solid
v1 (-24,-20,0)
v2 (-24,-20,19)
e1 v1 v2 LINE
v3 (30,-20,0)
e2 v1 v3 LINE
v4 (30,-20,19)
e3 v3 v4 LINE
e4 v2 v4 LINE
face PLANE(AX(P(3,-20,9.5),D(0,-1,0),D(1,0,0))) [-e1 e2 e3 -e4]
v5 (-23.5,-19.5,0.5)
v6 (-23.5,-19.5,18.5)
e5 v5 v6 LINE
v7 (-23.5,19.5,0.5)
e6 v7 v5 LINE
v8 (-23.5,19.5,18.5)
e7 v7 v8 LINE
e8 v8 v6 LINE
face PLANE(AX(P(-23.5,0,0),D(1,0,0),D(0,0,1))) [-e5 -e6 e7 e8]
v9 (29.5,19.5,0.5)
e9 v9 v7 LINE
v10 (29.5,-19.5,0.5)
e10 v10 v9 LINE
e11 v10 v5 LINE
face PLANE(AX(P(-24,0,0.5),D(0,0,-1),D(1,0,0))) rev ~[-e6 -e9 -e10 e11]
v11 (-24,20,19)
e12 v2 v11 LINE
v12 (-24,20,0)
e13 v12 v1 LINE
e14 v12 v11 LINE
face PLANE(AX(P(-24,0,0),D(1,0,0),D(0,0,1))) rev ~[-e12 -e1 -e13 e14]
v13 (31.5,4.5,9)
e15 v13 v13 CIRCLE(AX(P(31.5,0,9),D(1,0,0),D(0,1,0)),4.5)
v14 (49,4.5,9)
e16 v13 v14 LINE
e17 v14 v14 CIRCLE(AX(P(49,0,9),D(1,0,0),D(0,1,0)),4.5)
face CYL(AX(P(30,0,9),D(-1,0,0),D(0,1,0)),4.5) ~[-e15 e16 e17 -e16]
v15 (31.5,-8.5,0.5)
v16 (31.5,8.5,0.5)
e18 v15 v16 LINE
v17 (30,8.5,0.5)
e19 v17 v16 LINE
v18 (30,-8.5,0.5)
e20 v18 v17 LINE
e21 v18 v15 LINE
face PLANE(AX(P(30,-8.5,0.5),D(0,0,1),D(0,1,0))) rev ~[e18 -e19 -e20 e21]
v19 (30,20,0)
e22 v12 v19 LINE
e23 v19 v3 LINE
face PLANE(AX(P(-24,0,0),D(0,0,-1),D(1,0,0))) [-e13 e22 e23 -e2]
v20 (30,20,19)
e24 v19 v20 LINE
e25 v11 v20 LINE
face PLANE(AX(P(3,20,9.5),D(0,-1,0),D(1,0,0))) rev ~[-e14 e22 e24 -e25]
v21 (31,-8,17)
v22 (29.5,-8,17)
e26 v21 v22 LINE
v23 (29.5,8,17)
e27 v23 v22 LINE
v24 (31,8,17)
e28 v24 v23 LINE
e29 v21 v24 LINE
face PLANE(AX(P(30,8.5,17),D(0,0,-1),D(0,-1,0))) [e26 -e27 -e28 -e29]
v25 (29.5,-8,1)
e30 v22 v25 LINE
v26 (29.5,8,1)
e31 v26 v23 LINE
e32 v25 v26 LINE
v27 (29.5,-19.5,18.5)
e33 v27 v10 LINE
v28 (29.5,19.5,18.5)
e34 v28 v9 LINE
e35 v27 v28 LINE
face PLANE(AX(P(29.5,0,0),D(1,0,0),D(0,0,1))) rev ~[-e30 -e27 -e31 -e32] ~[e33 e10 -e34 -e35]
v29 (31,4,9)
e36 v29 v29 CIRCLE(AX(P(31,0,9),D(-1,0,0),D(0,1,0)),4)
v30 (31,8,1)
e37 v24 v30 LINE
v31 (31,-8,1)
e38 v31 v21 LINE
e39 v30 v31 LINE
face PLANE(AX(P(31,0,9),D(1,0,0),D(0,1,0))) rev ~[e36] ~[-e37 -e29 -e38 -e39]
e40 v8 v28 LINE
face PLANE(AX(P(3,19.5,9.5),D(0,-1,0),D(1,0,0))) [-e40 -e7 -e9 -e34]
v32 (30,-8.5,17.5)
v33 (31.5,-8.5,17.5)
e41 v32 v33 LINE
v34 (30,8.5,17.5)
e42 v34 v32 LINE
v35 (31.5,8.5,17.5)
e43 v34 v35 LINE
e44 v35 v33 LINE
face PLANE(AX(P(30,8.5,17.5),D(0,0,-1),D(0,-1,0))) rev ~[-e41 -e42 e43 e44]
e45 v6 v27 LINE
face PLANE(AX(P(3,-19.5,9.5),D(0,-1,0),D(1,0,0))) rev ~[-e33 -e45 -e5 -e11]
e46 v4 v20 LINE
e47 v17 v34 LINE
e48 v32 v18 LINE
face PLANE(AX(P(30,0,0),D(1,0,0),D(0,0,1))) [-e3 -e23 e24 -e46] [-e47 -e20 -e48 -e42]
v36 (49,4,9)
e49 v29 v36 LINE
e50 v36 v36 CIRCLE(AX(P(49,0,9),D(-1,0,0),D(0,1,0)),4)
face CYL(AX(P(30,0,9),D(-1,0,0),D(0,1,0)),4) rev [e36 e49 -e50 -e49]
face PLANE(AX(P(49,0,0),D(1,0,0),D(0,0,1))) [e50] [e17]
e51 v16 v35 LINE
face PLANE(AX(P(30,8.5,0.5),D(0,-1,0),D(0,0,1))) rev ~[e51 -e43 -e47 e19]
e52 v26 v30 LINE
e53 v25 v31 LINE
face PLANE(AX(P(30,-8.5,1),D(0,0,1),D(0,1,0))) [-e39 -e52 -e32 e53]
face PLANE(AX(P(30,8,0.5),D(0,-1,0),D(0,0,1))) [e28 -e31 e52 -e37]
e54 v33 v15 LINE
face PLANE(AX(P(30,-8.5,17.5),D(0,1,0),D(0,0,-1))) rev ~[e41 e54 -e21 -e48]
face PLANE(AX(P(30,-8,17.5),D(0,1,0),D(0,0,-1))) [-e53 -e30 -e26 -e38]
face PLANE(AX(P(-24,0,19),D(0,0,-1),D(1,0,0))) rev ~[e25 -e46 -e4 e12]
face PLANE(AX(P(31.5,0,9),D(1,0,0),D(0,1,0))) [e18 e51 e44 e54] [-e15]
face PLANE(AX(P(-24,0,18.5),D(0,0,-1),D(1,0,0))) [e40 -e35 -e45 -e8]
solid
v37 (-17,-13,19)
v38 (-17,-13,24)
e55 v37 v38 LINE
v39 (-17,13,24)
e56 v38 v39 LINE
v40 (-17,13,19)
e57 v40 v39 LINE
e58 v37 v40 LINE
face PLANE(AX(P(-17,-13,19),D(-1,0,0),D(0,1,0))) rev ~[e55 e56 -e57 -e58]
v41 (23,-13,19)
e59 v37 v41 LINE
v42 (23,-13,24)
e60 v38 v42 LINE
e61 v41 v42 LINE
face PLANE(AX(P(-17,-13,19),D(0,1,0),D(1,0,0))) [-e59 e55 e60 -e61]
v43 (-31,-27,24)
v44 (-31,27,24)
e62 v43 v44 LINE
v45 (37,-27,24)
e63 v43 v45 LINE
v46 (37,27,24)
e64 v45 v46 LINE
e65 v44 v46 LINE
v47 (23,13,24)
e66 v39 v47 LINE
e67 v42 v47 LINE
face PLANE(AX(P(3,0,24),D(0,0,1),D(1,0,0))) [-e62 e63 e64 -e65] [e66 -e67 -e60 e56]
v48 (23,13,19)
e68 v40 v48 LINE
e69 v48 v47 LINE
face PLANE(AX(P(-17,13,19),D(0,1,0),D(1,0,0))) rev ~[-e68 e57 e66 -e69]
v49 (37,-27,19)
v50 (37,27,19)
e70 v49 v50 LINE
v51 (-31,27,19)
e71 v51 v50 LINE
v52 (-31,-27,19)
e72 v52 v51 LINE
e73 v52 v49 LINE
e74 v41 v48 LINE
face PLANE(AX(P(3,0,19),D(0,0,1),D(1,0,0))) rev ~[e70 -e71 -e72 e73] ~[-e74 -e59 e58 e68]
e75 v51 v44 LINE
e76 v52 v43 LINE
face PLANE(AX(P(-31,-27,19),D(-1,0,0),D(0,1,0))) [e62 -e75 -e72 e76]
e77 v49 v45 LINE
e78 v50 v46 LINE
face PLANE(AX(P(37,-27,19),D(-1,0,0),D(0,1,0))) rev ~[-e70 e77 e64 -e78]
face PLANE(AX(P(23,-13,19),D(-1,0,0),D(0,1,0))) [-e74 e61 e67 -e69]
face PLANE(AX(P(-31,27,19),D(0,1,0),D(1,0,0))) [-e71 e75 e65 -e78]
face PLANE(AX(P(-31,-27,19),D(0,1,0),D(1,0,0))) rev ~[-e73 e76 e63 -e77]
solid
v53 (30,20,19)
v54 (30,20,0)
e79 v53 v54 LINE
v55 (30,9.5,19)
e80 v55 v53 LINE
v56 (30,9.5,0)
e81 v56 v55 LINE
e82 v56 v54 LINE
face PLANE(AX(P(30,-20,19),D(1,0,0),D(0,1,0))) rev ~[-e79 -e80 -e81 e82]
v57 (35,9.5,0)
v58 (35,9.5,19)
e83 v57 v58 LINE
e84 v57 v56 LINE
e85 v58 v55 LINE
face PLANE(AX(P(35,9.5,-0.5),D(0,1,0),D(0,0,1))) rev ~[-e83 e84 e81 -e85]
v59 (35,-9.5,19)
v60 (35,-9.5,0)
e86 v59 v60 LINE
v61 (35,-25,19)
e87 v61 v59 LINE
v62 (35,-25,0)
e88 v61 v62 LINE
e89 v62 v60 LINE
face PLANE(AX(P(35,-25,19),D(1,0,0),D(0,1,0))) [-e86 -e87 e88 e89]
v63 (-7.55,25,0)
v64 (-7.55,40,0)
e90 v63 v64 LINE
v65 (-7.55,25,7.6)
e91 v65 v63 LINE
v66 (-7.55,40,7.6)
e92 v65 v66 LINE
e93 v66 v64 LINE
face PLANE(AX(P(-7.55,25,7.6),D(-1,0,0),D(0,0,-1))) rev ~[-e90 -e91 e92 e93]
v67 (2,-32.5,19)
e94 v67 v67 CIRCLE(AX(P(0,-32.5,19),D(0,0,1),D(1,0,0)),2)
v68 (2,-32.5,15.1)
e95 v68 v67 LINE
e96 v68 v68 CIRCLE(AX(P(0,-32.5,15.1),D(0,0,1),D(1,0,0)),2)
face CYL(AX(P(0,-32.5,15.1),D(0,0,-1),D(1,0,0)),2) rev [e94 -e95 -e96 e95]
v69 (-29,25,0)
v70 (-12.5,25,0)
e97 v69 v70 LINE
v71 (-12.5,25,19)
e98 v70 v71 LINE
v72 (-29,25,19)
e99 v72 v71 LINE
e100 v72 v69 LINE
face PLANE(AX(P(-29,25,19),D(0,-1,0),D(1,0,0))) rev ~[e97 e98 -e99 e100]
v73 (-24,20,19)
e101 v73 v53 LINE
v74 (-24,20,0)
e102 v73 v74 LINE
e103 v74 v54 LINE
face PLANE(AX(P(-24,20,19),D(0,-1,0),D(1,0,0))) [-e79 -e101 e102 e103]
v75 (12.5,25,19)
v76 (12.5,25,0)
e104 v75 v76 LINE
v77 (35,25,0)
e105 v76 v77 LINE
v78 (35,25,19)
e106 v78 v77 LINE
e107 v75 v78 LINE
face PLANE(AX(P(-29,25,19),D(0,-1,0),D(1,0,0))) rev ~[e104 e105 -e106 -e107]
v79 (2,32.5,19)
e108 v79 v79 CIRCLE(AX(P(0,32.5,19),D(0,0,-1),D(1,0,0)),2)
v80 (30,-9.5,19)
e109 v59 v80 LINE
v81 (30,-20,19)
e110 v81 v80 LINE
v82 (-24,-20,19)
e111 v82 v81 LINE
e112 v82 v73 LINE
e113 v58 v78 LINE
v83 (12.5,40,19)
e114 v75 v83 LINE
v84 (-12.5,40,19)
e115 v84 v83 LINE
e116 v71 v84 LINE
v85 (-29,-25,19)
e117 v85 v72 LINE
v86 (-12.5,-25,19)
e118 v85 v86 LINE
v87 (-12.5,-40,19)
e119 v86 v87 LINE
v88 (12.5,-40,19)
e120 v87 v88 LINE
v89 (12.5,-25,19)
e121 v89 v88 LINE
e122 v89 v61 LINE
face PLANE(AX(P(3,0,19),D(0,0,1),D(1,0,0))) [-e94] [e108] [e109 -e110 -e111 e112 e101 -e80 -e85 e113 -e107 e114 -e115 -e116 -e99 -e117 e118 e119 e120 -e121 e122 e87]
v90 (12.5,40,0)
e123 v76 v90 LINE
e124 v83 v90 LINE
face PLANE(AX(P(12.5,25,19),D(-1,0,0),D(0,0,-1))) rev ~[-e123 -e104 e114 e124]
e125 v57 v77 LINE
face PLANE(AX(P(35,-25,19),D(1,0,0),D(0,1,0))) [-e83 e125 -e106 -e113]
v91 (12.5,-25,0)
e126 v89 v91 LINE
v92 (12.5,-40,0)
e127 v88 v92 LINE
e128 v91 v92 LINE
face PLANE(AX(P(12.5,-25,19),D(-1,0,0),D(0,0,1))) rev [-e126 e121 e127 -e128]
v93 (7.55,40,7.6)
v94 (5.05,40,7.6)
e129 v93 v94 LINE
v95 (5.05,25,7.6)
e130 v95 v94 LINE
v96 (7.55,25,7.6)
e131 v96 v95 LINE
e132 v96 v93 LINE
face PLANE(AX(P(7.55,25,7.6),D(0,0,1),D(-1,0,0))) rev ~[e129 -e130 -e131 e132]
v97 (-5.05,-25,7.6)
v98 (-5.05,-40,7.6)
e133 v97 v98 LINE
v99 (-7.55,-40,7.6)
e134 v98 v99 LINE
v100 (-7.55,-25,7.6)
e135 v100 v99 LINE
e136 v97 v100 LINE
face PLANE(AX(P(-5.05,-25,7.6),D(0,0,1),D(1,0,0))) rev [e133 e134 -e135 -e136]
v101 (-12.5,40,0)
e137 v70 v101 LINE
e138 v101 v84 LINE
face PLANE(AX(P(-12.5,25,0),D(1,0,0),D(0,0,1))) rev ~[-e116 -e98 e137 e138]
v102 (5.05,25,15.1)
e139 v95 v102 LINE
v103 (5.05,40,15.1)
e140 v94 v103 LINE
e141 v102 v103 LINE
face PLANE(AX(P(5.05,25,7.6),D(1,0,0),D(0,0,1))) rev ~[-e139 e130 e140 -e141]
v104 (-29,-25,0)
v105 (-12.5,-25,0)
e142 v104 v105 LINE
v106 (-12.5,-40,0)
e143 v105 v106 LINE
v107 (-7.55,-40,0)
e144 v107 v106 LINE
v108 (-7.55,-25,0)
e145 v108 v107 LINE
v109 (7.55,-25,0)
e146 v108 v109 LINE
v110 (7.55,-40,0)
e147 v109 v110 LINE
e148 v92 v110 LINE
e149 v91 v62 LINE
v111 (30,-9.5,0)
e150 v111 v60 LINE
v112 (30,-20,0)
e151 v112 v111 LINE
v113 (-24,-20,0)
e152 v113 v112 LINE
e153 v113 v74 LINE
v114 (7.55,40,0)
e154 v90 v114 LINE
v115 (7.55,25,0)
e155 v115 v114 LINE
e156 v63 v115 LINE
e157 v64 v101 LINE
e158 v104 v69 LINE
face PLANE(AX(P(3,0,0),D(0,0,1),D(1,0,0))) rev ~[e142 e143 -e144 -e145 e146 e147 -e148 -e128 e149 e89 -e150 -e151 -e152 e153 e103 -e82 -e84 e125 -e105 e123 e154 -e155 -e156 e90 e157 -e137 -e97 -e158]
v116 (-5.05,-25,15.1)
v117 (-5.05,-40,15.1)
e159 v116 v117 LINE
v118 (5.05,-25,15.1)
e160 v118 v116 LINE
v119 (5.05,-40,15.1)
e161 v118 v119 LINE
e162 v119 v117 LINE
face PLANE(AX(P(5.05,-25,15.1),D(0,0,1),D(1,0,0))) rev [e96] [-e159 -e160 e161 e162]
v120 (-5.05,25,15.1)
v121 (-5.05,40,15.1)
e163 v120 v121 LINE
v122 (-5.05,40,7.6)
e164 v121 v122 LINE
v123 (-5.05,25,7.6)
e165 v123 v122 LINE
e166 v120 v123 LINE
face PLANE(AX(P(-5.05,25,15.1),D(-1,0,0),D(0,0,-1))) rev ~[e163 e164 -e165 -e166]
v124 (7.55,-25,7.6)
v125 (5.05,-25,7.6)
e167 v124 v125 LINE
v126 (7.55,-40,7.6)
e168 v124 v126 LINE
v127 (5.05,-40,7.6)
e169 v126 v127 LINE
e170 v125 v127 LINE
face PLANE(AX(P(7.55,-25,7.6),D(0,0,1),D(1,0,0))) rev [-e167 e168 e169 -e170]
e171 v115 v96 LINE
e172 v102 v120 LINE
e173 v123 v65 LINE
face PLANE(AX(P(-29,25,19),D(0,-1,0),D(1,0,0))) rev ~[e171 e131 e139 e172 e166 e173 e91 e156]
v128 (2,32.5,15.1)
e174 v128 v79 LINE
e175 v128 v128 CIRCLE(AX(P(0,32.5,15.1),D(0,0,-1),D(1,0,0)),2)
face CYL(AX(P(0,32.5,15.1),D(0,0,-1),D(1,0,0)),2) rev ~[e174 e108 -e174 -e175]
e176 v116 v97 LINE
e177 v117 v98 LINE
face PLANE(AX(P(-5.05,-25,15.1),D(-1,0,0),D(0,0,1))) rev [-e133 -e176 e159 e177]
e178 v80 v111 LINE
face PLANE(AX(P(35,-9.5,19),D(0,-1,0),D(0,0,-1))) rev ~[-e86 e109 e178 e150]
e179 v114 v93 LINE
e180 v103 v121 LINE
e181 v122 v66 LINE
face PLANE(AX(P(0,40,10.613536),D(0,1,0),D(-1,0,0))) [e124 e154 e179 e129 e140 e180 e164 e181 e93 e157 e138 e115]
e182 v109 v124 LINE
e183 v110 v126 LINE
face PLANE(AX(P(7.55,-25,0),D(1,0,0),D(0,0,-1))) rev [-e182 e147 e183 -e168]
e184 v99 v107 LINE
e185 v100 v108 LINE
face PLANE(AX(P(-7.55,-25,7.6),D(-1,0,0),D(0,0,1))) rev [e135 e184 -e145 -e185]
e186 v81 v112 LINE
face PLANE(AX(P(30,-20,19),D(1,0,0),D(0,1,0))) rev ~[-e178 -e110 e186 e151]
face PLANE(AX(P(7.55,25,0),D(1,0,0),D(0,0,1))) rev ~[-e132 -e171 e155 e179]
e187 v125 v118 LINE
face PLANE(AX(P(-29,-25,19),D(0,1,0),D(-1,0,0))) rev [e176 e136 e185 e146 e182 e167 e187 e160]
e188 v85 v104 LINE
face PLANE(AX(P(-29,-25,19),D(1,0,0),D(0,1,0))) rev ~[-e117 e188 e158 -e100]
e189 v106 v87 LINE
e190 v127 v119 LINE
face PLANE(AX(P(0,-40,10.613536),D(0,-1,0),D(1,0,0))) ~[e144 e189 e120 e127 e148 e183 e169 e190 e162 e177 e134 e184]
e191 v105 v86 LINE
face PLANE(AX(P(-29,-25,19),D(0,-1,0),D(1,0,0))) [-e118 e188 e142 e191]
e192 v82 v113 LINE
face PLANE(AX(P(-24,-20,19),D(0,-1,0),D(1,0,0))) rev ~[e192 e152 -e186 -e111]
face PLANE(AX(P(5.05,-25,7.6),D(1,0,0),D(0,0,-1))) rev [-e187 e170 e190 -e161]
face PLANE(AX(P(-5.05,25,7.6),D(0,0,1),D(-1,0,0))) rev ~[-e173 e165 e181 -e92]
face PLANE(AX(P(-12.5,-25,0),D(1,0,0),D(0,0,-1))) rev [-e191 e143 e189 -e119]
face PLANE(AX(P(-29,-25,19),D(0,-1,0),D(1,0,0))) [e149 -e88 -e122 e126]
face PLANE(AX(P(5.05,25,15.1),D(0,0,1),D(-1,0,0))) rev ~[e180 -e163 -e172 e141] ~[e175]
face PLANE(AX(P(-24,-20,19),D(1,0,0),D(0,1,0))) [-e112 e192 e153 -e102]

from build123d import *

# Parameters (mm, degrees)
F0_W      = 54
F0_H      = 19
F1_DEPTH  = 20
F2_R      = 4.5
F3_DEPTH  = 1.5
F4_DEPTH  = 19
F5_T      = -0.5
F6_W      = 64
F6_H      = 50
F6_W_2    = 54
F6_H_2    = 40
F7_DEPTH  = 19
F9_DEPTH  = 25
F11_W     = 68
F11_H     = 54
F11_W_2   = 64
F11_H_2   = 50
F12_DEPTH = 5
F11_W_3   = 54
F11_H_3   = 40
F11_W_4   = 40
F11_H_4   = 26
F15_DEPTH = 15
F16_R     = 2
F17_DEPTH = 8.901


with BuildPart() as f1:
    # F0 (on Front) → F1 (new body, symmetric)
    with BuildSketch(Plane.XZ):
        with Locations((3, 9.5)):
            Rectangle(F0_W, F0_H)
    extrude(amount=F1_DEPTH, both=True)

    # F2 (on face) → F3 (join)
    with BuildSketch(Plane.YZ.offset(30)):
        Polygon((-8.5, 17.5), (-8.5, 0.5), (0, 0.5), (8.5, 0.5), (8.5, 17.5), (0, 17.5), align=None)
        with Locations((0, 9)):
            Circle(F2_R, mode=Mode.SUBTRACT)
    extrude(amount=F3_DEPTH)

    # F4 (add): a face of the model
    f4_faces = [f1.faces().sort_by_distance(p)[0] for p in [
        (30, 0, 9),
    ]]
    extrude(f4_faces, amount=F4_DEPTH)

    # F5
    f5_openings = [f1.faces().sort_by_distance(p)[0] for p in [
        (49, 0, 9),
    ]]
    offset(amount=F5_T, openings=f5_openings, kind=Kind.INTERSECTION)


with BuildPart() as f7:
    # F6 (on face) → F7 (new body, through all)
    with BuildSketch(Plane.XY.offset(19)):
        with Locations((3, 0)):
            Rectangle(F6_W, F6_H)
        with Locations((3, 0)):
            Rectangle(F6_W_2, F6_H_2, mode=Mode.SUBTRACT)
    extrude(amount=-F7_DEPTH)

    # F8 (on face) → F9 (cut)
    with BuildSketch(Plane.YZ.offset(35)):
        Polygon((0, -0.5), (9.5, -0.5), (9.5, 19), (0, 19), (-9.5, 19), (-9.5, -0.5), align=None)
    extrude(amount=-F9_DEPTH, mode=Mode.SUBTRACT)

    # F13 (on face) → F15 (join)
    with BuildSketch(Plane(origin=(0, 25, 0), x_dir=(-1, 0, 0), z_dir=(0, 1, 0))):
        Polygon((-12.5, 0), (-7.55, 0), (-7.55, 7.6), (-5.05, 7.6), (-5.05, 15.1), (0, 15.1), (5.05, 15.1), (5.05, 7.6), (7.55, 7.6), (7.55, 0), (12.5, 0), (12.5, 19), (0, 19), (-12.5, 19), align=None)
    extrude(amount=F15_DEPTH)

    # F16 (on face) → F17 (cut, through all)
    with BuildSketch(Plane(origin=(0, 0, 15.1), x_dir=(1, 0, 0), z_dir=(0, 0, -1))):
        with Locations((0, -32.5)):
            Circle(F16_R)
    extrude(amount=-F17_DEPTH, mode=Mode.SUBTRACT)

    # F18: F7 across plane


with BuildPart() as f12:
    # F11 (on face) → F12 (new body)
    with BuildSketch(Plane.XY.offset(19)):
        with Locations((3, 0)):
            Rectangle(F11_W, F11_H)
        with Locations((3, 0)):
            Rectangle(F11_W_2, F11_H_2, mode=Mode.SUBTRACT)
    extrude(amount=F12_DEPTH)



with BuildPart() as f12b:
    # F11 (on face) → F12, piece 2 (new body)
    with BuildSketch(Plane.XY.offset(19)):
        with Locations((3, 0)):
            Rectangle(F11_W_3, F11_H_3)
        with Locations((3, 0)):
            Rectangle(F11_W_4, F11_H_4, mode=Mode.SUBTRACT)
    extrude(amount=F12_DEPTH)


with BuildPart() as f12_1:
    add(f12.part)

    add(f12b.part)  # F12#3 merges F12b
    # F6 (on face) → F12, piece 3 (join)
    with BuildSketch(Plane.XY.offset(19)):
        with Locations((3, 0)):
            Rectangle(F6_W, F6_H)
        with Locations((3, 0)):
            Rectangle(F6_W_2, F6_H_2, mode=Mode.SUBTRACT)
    extrude(amount=F12_DEPTH)


with BuildPart() as f7_1:
    add(f7.part)
    add(f7.part.mirror(Plane.XZ))


solid = Compound([f1.part, f12_1.part, f7_1.part])
